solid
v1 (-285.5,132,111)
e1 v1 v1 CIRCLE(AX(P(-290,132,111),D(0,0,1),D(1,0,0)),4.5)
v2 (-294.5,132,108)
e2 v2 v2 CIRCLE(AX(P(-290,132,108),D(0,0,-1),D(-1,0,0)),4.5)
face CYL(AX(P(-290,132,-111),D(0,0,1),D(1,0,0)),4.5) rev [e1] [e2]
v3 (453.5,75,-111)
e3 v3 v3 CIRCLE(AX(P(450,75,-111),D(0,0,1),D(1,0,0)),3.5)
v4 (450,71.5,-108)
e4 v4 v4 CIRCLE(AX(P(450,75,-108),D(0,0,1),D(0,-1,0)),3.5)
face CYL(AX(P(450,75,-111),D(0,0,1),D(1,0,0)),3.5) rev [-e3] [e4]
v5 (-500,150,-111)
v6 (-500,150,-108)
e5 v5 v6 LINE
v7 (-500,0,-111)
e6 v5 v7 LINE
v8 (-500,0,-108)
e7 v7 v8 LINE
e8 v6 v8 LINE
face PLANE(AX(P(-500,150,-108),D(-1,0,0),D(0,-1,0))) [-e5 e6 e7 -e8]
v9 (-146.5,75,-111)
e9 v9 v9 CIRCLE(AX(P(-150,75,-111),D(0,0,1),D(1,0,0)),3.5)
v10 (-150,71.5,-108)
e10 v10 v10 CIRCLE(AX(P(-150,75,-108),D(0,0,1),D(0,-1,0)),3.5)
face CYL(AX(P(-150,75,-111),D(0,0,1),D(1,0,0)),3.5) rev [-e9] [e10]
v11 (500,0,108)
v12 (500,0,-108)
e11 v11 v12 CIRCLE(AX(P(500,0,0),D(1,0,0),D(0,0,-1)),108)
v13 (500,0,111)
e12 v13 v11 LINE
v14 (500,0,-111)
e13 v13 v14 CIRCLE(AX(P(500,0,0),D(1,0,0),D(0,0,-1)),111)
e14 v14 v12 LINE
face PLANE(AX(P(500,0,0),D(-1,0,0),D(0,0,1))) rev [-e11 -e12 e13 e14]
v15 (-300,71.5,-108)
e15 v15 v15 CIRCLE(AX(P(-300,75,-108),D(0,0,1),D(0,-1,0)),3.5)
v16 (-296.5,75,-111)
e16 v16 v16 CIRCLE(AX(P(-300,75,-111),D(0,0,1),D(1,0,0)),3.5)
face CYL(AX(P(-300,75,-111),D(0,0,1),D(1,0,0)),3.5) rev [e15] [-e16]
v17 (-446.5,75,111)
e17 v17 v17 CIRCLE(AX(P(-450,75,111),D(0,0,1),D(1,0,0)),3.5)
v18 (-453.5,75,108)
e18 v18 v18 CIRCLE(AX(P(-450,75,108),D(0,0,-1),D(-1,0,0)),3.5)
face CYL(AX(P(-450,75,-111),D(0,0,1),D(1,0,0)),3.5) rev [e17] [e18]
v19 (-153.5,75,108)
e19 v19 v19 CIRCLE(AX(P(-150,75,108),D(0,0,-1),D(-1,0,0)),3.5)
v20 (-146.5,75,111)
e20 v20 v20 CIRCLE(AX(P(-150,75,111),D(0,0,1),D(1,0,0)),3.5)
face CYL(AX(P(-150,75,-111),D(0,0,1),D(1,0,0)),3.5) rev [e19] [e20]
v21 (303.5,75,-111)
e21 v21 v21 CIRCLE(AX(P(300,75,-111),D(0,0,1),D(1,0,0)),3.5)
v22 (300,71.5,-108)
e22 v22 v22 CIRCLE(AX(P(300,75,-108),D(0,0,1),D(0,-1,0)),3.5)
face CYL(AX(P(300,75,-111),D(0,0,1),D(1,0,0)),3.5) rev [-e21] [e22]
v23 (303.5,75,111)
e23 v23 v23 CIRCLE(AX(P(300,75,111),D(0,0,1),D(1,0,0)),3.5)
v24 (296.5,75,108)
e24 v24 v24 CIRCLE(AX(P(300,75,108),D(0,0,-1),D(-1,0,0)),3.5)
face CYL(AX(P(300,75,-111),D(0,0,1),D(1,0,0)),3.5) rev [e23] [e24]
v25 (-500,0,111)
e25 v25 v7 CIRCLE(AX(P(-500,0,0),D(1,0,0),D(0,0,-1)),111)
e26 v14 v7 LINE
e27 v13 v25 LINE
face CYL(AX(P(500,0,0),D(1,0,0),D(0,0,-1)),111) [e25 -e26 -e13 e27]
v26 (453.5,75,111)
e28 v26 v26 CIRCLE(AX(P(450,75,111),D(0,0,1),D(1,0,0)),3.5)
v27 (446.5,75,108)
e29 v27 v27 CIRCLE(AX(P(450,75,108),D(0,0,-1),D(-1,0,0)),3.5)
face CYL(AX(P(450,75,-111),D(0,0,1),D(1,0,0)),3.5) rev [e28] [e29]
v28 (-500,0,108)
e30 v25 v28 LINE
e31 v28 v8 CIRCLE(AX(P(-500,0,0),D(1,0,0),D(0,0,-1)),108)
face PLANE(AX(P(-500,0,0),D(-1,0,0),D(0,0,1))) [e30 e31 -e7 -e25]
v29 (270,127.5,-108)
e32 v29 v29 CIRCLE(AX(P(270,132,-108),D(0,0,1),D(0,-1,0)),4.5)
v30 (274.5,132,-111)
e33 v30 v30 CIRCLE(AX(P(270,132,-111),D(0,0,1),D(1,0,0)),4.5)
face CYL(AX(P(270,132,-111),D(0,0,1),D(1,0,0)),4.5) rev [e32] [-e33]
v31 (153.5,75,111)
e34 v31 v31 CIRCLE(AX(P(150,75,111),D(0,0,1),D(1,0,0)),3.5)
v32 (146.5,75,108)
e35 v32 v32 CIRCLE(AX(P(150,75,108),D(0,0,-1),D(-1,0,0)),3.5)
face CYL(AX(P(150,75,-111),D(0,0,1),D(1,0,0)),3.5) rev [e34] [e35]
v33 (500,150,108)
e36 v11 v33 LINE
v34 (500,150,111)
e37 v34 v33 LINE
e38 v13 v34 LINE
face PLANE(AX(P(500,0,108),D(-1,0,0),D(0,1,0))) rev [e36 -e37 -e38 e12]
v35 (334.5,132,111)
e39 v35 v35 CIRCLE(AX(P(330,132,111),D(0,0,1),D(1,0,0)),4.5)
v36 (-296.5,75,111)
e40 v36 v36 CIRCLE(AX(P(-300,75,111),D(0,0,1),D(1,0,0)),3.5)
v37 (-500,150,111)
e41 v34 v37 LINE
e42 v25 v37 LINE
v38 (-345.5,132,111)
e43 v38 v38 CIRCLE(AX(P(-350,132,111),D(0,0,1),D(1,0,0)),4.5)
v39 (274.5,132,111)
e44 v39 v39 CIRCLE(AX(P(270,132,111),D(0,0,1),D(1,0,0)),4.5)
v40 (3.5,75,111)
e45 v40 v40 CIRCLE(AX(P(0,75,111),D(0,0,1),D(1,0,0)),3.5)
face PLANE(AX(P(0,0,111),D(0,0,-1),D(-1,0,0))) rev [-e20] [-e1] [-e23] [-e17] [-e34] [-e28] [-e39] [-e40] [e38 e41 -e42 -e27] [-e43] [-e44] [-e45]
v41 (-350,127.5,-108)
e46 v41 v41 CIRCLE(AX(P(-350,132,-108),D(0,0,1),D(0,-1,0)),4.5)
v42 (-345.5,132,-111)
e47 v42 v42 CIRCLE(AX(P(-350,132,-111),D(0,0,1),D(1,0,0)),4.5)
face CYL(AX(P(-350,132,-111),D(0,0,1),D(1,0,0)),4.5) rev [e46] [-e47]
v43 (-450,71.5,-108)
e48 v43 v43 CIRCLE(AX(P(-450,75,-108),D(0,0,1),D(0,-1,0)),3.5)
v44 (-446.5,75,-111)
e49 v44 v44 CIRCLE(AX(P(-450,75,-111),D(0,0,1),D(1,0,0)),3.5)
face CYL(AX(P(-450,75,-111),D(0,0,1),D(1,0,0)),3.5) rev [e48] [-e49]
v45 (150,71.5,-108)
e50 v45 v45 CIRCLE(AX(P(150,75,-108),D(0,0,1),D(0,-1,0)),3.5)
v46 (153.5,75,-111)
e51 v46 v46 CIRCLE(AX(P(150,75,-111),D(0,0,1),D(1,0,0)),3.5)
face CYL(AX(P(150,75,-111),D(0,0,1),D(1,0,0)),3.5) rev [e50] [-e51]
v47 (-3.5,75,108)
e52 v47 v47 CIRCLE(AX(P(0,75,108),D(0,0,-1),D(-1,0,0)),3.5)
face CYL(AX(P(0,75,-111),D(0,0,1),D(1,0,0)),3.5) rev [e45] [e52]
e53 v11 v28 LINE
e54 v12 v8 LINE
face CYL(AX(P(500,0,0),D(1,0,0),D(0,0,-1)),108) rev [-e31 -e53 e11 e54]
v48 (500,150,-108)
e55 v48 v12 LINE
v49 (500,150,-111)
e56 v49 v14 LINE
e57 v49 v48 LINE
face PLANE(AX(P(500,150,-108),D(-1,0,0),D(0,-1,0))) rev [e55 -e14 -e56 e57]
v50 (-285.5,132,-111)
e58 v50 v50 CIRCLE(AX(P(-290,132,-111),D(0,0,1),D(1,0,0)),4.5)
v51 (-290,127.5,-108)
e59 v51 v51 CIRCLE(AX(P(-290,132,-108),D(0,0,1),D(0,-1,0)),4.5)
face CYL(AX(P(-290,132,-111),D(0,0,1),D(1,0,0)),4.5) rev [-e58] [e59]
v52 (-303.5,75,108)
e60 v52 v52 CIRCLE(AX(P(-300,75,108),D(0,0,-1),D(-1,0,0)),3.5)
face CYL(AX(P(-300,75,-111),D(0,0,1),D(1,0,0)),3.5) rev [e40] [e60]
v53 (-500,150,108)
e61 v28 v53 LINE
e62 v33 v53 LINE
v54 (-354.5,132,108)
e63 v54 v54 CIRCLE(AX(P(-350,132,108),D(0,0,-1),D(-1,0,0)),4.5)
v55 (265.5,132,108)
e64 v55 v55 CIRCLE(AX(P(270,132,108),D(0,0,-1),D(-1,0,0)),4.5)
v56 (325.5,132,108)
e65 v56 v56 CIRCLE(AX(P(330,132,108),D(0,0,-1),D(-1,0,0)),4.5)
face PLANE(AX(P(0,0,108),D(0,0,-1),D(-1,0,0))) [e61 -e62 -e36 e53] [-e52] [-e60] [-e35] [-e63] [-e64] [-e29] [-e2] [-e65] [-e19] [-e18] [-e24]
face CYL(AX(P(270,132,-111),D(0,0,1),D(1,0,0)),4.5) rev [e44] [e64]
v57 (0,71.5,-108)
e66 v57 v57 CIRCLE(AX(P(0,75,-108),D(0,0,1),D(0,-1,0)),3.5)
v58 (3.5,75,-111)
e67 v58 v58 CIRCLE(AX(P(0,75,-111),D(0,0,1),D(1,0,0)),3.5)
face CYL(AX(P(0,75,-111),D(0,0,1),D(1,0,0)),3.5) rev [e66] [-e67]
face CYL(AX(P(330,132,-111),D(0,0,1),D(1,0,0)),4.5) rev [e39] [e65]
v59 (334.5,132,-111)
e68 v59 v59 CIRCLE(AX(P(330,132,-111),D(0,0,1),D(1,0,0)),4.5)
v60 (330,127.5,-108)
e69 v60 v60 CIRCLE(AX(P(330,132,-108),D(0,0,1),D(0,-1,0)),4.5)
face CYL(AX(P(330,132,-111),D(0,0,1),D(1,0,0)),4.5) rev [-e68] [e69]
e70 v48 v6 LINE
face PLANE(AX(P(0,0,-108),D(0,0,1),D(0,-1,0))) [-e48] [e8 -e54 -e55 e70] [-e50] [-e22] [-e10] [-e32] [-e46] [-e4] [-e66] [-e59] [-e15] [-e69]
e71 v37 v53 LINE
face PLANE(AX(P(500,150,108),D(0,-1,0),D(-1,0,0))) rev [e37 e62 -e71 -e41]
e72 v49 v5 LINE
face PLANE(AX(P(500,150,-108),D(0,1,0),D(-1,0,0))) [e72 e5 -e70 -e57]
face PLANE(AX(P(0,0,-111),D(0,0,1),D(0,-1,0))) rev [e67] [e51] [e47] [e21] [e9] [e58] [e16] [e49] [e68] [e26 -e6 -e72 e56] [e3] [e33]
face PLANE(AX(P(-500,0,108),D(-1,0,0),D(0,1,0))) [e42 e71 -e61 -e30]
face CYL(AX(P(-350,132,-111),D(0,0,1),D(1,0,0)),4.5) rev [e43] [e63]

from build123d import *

# Parameters (mm, degrees)
OTHER_START              = -500
OTHER_2_DEPTH            = 1000
CUT_EXTRUDE_4_DEPTH      = 534.686237409
CUT_EXTRUDE_4_DEPTH_BACK = 534.686237409
SKETCH_13_R              = 3.5
SKETCH_13_R_2            = 4.5


# Read off the part's stored shape, not the designer's step: Элемент по сечениям сгиба2
with BuildPart() as part:
    # Other 2 outline → Other 2 (new body)
    with BuildSketch(Plane.YZ.offset(OTHER_START)):
        with BuildLine():
            Line((0, -111), (150, -111))
            Line((150, -111), (150, -108))
            Line((150, -108), (0, -108))
            ThreePointArc((0, -108), (-108, 0), (0, 108))
            Line((0, 108), (150, 108))
            Line((150, 108), (150, 111))
            Line((150, 111), (0, 111))
            ThreePointArc((0, 111), (-111, 0), (0, -111))
        make_face()
    extrude(amount=OTHER_2_DEPTH)

    # Эскиз13 → Вырез-Вытянуть4 (cut, two sides: drawn at the far end of the back side and taken through both)
    with BuildSketch(Plane.XY.offset(-CUT_EXTRUDE_4_DEPTH_BACK)):
        with Locations((450, 75)):
            Circle(SKETCH_13_R)
        with Locations((300, 75)):
            Circle(SKETCH_13_R)
        with Locations((150, 75)):
            Circle(SKETCH_13_R)
        with Locations((0, 75)):
            Circle(SKETCH_13_R)
        with Locations((-150, 75)):
            Circle(SKETCH_13_R)
        with Locations((-300, 75)):
            Circle(SKETCH_13_R)
        with Locations((-450, 75)):
            Circle(SKETCH_13_R)
        with Locations((330, 132)):
            Circle(SKETCH_13_R_2)
        with Locations((270, 132)):
            Circle(SKETCH_13_R_2)
        with Locations((-350, 132)):
            Circle(SKETCH_13_R_2)
        with Locations((-290, 132)):
            Circle(SKETCH_13_R_2)
    extrude(amount=CUT_EXTRUDE_4_DEPTH + CUT_EXTRUDE_4_DEPTH_BACK, mode=Mode.SUBTRACT)


solid = part.part
